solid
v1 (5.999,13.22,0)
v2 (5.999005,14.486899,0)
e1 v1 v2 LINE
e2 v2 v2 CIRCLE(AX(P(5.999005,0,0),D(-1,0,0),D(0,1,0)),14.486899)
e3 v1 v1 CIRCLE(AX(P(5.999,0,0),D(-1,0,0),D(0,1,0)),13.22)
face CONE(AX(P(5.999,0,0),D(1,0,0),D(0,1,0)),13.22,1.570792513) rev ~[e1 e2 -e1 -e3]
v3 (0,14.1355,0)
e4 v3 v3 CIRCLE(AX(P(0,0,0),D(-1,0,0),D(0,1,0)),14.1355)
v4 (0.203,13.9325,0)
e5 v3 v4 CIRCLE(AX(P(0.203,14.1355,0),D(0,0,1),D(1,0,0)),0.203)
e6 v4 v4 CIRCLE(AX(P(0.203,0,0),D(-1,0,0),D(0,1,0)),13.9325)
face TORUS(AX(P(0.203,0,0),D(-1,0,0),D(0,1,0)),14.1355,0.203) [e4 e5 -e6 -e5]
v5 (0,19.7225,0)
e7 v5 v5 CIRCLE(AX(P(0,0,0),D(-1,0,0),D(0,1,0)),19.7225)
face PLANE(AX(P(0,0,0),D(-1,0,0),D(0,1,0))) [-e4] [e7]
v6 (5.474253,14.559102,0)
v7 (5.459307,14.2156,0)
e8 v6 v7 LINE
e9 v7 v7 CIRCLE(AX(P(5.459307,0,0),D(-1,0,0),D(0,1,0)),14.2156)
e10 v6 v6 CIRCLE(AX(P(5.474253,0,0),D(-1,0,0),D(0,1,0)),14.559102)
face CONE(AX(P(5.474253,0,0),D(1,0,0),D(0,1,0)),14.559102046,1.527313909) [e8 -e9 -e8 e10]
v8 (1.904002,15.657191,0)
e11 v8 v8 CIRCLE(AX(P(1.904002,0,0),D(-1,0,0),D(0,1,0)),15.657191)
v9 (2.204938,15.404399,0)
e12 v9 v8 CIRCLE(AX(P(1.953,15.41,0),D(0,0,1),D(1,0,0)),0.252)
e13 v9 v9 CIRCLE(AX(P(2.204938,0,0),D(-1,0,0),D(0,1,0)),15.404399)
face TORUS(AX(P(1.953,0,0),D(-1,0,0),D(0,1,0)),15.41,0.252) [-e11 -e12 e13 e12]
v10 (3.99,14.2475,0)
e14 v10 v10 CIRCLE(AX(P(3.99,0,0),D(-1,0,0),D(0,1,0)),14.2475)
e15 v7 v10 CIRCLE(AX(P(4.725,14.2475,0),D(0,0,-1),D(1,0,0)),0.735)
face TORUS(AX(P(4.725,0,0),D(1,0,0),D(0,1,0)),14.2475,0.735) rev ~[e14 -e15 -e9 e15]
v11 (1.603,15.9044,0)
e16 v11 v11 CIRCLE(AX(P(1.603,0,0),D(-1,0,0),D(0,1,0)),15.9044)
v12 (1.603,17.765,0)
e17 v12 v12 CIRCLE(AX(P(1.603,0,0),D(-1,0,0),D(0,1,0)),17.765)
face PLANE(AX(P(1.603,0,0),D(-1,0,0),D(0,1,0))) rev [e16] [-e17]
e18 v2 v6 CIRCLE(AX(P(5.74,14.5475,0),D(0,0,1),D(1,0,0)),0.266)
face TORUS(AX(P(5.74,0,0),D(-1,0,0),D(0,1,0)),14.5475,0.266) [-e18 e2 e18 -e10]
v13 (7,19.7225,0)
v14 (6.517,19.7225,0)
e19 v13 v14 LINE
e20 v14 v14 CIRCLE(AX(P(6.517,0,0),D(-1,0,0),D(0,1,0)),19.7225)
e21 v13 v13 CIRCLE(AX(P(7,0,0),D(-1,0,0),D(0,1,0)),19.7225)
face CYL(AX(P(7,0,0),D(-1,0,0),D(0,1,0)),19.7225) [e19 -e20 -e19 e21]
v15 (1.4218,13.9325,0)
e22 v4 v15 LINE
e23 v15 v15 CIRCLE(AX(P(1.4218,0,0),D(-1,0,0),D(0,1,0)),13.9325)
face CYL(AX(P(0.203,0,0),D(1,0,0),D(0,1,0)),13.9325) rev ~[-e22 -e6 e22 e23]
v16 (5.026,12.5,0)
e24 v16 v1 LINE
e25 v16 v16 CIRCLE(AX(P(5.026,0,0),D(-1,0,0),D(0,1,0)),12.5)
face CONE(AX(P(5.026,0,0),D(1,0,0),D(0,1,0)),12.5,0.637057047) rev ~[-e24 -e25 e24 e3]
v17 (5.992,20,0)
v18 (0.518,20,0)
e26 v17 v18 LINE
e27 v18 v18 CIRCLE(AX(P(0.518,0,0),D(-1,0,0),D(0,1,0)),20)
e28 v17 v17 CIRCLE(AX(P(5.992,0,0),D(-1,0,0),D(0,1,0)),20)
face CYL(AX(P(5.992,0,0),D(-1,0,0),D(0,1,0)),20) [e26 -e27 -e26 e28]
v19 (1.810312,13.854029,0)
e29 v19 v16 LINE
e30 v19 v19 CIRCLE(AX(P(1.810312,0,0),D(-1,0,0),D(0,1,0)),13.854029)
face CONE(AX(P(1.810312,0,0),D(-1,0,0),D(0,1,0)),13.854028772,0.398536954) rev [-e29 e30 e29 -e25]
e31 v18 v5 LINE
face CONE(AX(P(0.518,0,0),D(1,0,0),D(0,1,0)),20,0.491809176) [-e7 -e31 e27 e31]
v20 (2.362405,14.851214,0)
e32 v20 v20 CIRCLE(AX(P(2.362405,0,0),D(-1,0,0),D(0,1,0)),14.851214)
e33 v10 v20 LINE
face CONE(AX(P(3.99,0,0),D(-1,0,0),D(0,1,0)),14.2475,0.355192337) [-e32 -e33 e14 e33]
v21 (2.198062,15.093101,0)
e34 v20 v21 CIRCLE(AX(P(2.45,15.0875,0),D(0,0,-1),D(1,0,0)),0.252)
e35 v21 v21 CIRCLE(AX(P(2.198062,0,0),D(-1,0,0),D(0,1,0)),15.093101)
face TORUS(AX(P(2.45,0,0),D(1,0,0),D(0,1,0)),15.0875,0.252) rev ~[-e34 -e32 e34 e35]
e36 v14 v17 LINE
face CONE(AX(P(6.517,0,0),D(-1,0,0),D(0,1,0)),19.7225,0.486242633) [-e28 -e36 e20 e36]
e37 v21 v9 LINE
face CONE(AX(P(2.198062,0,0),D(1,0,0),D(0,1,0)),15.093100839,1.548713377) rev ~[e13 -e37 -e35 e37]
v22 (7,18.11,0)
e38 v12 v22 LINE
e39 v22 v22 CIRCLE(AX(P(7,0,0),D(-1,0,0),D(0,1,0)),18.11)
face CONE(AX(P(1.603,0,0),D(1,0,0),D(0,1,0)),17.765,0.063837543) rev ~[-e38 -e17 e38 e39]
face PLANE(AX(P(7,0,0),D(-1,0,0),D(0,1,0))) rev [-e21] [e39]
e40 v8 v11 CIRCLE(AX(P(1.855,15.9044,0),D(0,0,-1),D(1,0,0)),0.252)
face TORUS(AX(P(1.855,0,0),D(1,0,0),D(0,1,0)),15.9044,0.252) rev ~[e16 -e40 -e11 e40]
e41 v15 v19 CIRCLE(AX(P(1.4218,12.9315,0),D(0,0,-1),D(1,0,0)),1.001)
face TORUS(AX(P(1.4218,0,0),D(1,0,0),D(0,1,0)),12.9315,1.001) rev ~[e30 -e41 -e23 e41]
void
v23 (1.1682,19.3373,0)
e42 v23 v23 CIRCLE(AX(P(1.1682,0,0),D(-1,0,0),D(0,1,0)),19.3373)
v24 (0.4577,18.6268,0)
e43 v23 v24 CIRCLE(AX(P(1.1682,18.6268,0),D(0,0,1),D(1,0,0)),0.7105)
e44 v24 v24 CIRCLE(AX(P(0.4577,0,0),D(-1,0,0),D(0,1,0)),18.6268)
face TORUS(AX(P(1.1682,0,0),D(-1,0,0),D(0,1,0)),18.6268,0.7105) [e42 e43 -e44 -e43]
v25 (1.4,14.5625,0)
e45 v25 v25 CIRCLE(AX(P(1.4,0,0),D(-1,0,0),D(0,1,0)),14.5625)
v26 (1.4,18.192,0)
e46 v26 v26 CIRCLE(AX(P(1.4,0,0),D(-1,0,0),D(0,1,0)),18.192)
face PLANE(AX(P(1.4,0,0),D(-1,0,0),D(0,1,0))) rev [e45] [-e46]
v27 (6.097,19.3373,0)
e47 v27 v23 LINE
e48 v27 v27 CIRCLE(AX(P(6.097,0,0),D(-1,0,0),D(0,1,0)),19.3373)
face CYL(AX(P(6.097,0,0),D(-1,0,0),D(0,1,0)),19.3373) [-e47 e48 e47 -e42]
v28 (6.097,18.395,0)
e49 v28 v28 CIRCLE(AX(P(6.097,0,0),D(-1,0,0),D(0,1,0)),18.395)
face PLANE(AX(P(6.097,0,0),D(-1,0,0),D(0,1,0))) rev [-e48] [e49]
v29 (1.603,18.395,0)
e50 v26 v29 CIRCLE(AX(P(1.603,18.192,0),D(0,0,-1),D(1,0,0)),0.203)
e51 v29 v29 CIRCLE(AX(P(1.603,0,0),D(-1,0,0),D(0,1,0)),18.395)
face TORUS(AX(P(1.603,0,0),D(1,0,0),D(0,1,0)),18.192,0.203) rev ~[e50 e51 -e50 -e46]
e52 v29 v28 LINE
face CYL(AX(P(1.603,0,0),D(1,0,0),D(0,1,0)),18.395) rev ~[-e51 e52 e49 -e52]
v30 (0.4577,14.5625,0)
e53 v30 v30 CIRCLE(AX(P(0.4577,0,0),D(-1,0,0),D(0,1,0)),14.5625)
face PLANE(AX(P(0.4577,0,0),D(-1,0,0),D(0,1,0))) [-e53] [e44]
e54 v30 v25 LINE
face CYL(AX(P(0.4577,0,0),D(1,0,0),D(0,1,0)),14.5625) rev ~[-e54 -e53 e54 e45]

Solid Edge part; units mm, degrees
sketch "Sketch1" plane through (0, 0, 0) normal (0, 0, 1) x (1, 0, 0)
  arc A0 (0, 14.1355) -> (0.203, 13.9325) centre (0.203, 14.1355) ccw
  line L0 (0.203, 13.9325) -> (1.4218, 13.9325)
  arc A1 (1.4218, 13.9325) -> (1.8103, 13.854) centre (1.4218, 12.9315) cw
  line L1 (1.8103, 13.854) -> (5.026, 12.5)
  line L2 (5.026, 12.5) -> (5.999, 13.22)
  line L3 (5.999, 13.22) -> (5.999, 14.4869)
  arc A2 (5.999, 14.4869) -> (5.4743, 14.5591) centre (5.74, 14.5475) ccw
  line L4 (5.4743, 14.5591) -> (5.4593, 14.2156)
  arc A3 (5.4593, 14.2156) -> (3.99, 14.2475) centre (4.725, 14.2475) cw
  line L5 (3.99, 14.2475) -> (2.3624, 14.8512)
  arc A4 (2.3624, 14.8512) -> (2.1981, 15.0931) centre (2.45, 15.0875) cw
  line L6 (2.1981, 15.0931) -> (2.2049, 15.4044)
  arc A5 (2.2049, 15.4044) -> (1.904, 15.6572) centre (1.953, 15.41) ccw
  arc A6 (1.904, 15.6572) -> (1.603, 15.9044) centre (1.855, 15.9044) cw
  line L7 (1.603, 15.9044) -> (1.603, 17.765)
  line L8 (1.603, 17.765) -> (7, 18.11)
  line L9 (7, 18.11) -> (7, 19.7225)
  line L10 (7, 19.7225) -> (6.517, 19.7225)
  line L11 (6.517, 19.7225) -> (5.992, 20)
  line L12 (5.992, 20) -> (0.518, 20)
  line L13 (0.518, 20) -> (0, 19.7225)
  line L14 (0, 19.7225) -> (0, 14.1355)
revolve "RevolvedProtrusion1" add sketch "Sketch1" angle 360 about axis through (7, 0, 0) along (-1, 0, 0)
sketch "Sketch2" plane through (0, 0, 0) normal (0, 0, 1) x (1, 0, 0)
  line L0 (0.4577, 18.6268) -> (0.4577, 14.5625)
  line L1 (0.4577, 14.5625) -> (1.4, 14.5625)
  line L2 (1.4, 14.5625) -> (1.4, 18.192)
  arc A0 (1.4, 18.192) -> (1.603, 18.395) centre (1.603, 18.192) cw
  line L3 (1.603, 18.395) -> (6.097, 18.395)
  line L4 (6.097, 18.395) -> (6.097, 19.3373)
  line L5 (6.097, 19.3373) -> (1.1682, 19.3373)
  arc A1 (1.1682, 19.3373) -> (0.4577, 18.6268) centre (1.1682, 18.6268) ccw
revolve "RevolvedCutout1" cut sketch "Sketch2" angle 360 about axis through (7, 0, 0) along (-1, 0, 0)
properties part number "TRAB0025010"
